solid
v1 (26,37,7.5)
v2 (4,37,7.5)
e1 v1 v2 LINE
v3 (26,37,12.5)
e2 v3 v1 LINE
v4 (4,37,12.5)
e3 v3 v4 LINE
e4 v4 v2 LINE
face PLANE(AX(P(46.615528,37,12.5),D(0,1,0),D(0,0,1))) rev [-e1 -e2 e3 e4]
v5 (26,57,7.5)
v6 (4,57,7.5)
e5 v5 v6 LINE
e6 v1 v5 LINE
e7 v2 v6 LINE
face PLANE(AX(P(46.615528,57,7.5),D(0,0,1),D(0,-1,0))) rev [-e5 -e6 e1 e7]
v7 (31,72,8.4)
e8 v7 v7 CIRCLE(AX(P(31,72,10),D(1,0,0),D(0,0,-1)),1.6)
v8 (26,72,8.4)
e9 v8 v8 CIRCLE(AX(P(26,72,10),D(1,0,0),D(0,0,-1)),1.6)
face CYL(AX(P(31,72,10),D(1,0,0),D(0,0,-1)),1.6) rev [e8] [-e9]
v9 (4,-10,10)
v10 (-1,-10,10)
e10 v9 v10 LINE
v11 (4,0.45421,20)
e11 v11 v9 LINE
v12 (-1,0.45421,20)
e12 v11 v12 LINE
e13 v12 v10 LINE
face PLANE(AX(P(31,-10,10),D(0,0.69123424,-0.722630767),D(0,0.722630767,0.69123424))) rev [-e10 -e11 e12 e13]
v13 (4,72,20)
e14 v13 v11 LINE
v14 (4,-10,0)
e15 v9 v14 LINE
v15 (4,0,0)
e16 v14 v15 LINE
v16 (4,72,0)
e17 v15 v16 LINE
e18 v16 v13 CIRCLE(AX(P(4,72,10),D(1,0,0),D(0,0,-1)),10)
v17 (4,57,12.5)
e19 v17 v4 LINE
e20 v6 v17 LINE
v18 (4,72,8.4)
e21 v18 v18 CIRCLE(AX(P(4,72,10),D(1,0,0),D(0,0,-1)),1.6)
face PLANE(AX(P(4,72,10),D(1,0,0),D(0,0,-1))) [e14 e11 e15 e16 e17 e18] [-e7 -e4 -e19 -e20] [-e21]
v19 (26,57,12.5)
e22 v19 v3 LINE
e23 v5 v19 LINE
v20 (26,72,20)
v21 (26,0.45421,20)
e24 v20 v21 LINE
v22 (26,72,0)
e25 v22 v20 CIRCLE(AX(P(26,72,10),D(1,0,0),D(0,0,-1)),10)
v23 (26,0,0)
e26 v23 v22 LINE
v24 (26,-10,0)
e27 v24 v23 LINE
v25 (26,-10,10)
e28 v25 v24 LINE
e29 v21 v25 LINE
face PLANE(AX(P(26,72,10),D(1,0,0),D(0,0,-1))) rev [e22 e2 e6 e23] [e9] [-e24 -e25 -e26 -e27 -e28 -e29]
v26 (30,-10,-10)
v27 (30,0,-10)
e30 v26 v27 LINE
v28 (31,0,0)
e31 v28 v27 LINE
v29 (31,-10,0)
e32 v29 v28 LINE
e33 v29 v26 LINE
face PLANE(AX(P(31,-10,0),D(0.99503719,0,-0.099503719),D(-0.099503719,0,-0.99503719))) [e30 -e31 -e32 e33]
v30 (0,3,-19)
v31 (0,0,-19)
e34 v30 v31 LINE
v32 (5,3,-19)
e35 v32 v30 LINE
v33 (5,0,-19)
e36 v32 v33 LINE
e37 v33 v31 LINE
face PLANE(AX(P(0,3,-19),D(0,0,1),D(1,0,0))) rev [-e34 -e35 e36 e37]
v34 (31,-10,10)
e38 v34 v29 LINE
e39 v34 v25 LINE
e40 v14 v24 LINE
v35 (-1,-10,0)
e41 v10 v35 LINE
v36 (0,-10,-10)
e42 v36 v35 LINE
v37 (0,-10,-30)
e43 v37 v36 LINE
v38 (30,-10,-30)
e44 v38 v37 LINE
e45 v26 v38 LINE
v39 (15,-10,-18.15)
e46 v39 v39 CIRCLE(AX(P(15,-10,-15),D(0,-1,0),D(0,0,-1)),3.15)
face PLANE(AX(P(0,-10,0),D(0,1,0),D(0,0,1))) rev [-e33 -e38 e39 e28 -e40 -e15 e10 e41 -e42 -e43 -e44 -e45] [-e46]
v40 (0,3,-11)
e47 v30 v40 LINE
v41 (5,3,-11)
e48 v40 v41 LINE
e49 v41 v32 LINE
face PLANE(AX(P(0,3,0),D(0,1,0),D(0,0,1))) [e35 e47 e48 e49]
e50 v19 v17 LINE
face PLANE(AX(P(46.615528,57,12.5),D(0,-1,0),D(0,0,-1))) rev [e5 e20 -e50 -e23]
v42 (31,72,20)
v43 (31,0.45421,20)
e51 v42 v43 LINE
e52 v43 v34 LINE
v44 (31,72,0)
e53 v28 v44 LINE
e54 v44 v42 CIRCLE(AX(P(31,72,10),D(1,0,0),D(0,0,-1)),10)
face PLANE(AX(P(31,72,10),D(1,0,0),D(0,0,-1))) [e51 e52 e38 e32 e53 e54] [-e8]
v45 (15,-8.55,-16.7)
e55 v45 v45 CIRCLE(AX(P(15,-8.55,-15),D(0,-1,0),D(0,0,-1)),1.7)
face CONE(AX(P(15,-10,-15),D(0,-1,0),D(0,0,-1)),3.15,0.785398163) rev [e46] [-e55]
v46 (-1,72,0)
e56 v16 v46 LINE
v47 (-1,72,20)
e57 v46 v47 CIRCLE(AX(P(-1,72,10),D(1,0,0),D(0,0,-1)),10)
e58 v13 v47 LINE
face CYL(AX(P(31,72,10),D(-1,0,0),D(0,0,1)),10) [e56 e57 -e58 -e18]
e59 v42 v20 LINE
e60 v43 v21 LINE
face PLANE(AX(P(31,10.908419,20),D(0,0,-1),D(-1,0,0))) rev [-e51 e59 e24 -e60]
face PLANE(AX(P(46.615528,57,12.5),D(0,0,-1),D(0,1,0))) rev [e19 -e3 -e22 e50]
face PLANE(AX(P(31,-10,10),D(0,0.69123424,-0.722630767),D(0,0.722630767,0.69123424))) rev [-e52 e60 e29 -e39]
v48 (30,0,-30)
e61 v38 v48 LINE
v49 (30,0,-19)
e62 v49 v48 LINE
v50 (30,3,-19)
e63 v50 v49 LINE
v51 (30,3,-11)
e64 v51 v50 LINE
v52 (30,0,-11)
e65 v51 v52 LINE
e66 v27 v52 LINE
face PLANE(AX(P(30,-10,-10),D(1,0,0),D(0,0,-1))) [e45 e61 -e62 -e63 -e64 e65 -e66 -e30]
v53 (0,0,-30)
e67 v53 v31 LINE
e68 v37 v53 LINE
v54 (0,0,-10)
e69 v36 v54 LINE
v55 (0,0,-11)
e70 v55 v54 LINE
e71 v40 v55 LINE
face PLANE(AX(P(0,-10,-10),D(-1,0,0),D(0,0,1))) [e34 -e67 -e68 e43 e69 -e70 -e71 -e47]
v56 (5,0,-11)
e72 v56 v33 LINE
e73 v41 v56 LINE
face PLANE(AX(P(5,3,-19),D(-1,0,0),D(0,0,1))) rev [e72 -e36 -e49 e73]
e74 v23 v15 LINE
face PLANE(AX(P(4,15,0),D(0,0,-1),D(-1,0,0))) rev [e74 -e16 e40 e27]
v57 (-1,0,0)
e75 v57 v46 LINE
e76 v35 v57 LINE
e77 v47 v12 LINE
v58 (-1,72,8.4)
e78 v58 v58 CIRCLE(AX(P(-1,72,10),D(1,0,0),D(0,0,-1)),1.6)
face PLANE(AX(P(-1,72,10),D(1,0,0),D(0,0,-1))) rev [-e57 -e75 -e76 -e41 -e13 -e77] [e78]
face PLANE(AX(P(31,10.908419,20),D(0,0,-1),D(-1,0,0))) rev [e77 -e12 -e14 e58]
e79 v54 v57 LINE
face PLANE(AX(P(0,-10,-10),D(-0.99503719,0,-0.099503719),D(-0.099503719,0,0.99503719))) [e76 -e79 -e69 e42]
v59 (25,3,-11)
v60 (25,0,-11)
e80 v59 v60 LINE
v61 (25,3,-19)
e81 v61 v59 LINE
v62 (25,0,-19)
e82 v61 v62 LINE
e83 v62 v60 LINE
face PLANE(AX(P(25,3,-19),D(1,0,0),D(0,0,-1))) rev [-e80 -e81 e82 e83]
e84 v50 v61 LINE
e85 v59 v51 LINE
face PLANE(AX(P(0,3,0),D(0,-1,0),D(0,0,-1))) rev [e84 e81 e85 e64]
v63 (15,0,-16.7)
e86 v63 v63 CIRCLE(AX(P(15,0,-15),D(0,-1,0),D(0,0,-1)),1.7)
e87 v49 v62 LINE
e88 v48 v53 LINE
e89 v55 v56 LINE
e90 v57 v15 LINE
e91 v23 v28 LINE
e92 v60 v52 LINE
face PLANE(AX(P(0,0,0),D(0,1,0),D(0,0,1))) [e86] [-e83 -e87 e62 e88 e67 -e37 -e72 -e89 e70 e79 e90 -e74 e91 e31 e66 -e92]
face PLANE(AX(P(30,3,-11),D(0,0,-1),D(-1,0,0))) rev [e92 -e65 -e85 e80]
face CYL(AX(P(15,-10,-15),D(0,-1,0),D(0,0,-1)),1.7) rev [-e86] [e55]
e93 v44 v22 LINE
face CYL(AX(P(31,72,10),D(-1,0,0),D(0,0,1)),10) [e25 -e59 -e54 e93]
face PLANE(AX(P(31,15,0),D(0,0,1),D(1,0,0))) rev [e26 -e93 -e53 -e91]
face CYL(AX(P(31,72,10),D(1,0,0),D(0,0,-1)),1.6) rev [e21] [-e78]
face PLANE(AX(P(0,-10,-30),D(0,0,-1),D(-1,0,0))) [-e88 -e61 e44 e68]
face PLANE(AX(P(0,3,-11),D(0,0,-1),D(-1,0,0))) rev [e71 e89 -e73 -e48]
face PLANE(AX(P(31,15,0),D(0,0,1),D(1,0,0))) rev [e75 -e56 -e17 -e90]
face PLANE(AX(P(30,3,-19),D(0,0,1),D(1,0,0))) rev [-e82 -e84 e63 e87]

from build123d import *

# Parameters (mm, degrees)
EXTRUDE_1_DEPTH     = 10
SKETCH_4_W          = 5
SKETCH_4_H          = 8
EXTRUDE_3_DEPTH     = 3
EXTRUDE_4_DEPTH     = 16
CUT_EXTRUDE_1_DEPTH = 11
SKETCH_15_W         = 5
SKETCH_15_H         = 20
EXTRUDE_5_DEPTH     = 22
OTHER_START         = -1
OTHER_4_OUTLINE_R   = 1.6
OTHER_4_DEPTH       = 32


# Read off the part's stored shape, not the designer's step: 高级异型孔3, 高级异型孔4
with BuildPart() as part:
    # 草图1 → 凸台-拉伸1 (new body)
    with BuildSketch(Plane(origin=(0, 0, 0), x_dir=(1, 0, 0), z_dir=(0, 1, 0))):
        Polygon((0, 10), (0, 30), (30, 30), (30, 10), (31, 0), (30, 0), (0, 0), (-1, 0), align=None)
    extrude(amount=-EXTRUDE_1_DEPTH)

    # 草图4 → 凸台-拉伸3 (add)
    with BuildSketch(Plane(origin=(0, 0, 0), x_dir=(1, 0, 0), z_dir=(0, 1, 0))):
        with Locations((2.5, 15)):
            Rectangle(SKETCH_4_W, SKETCH_4_H)
        with Locations((27.5, 15)):
            Rectangle(SKETCH_4_W, SKETCH_4_H)
    extrude(amount=EXTRUDE_3_DEPTH)

    # 高级异型孔3 outline → 高级异型孔3 (revolve, cut)
    with BuildSketch(Plane(origin=(15, 0, -15), x_dir=(1, 0, 0), z_dir=(0, 0, 1))):
        Polygon((0, -10), (3.15, -10), (1.7, -8.55), (1.7, 0), (0, 0), align=None)
    revolve(axis=Axis((15, 0, -15), (0, 1, 0)), mode=Mode.SUBTRACT)

    # 草图13 → 凸台-拉伸4 (add, symmetric)
    with BuildSketch(Plane(origin=(15, 0, 0), x_dir=(0, 0, -1), z_dir=(1, 0, 0))):
        with BuildLine():
            Line((0, -10), (0, 15))
            Line((0, 15), (0, 72))
            ThreePointArc((0, 72), (-10, 82), (-20, 72))
            Line((-20, 72), (-20, 10.908419296))
            Line((-20, 10.908419296), (-20, 0.454209648))
            Line((-20, 0.454209648), (-10, -10))
            Line((-10, -10), (0, -10))
        make_face()
    extrude(amount=EXTRUDE_4_DEPTH, both=True)

    # 草图13<2> → 切除-拉伸1 (cut, symmetric)
    with BuildSketch(Plane(origin=(15, 0, 0), x_dir=(0, 0, -1), z_dir=(1, 0, 0))):
        with BuildLine():
            Line((0, -10), (0, 15))
            Line((0, 15), (0, 72))
            ThreePointArc((0, 72), (-10, 82), (-20, 72))
            Line((-20, 72), (-20, 10.908419296))
            Line((-20, 10.908419296), (-20, 0.454209648))
            Line((-20, 0.454209648), (-10, -10))
            Line((-10, -10), (0, -10))
        make_face()
    extrude(amount=CUT_EXTRUDE_1_DEPTH, both=True, mode=Mode.SUBTRACT)

    # 草图15 → 凸台-拉伸5 (add)
    with BuildSketch(Plane(origin=(4, 0, 0), x_dir=(0, 0, -1), z_dir=(1, 0, 0))):
        with Locations((-10, 47)):
            Rectangle(SKETCH_15_W, SKETCH_15_H)
    extrude(amount=EXTRUDE_5_DEPTH)

    # 高级异型孔4 outline → 高级异型孔4 (cut)
    with BuildSketch(Plane.YZ.offset(OTHER_START)):
        with Locations((72, 10)):
            Circle(OTHER_4_OUTLINE_R)
    extrude(amount=OTHER_4_DEPTH, mode=Mode.SUBTRACT)


solid = part.part
